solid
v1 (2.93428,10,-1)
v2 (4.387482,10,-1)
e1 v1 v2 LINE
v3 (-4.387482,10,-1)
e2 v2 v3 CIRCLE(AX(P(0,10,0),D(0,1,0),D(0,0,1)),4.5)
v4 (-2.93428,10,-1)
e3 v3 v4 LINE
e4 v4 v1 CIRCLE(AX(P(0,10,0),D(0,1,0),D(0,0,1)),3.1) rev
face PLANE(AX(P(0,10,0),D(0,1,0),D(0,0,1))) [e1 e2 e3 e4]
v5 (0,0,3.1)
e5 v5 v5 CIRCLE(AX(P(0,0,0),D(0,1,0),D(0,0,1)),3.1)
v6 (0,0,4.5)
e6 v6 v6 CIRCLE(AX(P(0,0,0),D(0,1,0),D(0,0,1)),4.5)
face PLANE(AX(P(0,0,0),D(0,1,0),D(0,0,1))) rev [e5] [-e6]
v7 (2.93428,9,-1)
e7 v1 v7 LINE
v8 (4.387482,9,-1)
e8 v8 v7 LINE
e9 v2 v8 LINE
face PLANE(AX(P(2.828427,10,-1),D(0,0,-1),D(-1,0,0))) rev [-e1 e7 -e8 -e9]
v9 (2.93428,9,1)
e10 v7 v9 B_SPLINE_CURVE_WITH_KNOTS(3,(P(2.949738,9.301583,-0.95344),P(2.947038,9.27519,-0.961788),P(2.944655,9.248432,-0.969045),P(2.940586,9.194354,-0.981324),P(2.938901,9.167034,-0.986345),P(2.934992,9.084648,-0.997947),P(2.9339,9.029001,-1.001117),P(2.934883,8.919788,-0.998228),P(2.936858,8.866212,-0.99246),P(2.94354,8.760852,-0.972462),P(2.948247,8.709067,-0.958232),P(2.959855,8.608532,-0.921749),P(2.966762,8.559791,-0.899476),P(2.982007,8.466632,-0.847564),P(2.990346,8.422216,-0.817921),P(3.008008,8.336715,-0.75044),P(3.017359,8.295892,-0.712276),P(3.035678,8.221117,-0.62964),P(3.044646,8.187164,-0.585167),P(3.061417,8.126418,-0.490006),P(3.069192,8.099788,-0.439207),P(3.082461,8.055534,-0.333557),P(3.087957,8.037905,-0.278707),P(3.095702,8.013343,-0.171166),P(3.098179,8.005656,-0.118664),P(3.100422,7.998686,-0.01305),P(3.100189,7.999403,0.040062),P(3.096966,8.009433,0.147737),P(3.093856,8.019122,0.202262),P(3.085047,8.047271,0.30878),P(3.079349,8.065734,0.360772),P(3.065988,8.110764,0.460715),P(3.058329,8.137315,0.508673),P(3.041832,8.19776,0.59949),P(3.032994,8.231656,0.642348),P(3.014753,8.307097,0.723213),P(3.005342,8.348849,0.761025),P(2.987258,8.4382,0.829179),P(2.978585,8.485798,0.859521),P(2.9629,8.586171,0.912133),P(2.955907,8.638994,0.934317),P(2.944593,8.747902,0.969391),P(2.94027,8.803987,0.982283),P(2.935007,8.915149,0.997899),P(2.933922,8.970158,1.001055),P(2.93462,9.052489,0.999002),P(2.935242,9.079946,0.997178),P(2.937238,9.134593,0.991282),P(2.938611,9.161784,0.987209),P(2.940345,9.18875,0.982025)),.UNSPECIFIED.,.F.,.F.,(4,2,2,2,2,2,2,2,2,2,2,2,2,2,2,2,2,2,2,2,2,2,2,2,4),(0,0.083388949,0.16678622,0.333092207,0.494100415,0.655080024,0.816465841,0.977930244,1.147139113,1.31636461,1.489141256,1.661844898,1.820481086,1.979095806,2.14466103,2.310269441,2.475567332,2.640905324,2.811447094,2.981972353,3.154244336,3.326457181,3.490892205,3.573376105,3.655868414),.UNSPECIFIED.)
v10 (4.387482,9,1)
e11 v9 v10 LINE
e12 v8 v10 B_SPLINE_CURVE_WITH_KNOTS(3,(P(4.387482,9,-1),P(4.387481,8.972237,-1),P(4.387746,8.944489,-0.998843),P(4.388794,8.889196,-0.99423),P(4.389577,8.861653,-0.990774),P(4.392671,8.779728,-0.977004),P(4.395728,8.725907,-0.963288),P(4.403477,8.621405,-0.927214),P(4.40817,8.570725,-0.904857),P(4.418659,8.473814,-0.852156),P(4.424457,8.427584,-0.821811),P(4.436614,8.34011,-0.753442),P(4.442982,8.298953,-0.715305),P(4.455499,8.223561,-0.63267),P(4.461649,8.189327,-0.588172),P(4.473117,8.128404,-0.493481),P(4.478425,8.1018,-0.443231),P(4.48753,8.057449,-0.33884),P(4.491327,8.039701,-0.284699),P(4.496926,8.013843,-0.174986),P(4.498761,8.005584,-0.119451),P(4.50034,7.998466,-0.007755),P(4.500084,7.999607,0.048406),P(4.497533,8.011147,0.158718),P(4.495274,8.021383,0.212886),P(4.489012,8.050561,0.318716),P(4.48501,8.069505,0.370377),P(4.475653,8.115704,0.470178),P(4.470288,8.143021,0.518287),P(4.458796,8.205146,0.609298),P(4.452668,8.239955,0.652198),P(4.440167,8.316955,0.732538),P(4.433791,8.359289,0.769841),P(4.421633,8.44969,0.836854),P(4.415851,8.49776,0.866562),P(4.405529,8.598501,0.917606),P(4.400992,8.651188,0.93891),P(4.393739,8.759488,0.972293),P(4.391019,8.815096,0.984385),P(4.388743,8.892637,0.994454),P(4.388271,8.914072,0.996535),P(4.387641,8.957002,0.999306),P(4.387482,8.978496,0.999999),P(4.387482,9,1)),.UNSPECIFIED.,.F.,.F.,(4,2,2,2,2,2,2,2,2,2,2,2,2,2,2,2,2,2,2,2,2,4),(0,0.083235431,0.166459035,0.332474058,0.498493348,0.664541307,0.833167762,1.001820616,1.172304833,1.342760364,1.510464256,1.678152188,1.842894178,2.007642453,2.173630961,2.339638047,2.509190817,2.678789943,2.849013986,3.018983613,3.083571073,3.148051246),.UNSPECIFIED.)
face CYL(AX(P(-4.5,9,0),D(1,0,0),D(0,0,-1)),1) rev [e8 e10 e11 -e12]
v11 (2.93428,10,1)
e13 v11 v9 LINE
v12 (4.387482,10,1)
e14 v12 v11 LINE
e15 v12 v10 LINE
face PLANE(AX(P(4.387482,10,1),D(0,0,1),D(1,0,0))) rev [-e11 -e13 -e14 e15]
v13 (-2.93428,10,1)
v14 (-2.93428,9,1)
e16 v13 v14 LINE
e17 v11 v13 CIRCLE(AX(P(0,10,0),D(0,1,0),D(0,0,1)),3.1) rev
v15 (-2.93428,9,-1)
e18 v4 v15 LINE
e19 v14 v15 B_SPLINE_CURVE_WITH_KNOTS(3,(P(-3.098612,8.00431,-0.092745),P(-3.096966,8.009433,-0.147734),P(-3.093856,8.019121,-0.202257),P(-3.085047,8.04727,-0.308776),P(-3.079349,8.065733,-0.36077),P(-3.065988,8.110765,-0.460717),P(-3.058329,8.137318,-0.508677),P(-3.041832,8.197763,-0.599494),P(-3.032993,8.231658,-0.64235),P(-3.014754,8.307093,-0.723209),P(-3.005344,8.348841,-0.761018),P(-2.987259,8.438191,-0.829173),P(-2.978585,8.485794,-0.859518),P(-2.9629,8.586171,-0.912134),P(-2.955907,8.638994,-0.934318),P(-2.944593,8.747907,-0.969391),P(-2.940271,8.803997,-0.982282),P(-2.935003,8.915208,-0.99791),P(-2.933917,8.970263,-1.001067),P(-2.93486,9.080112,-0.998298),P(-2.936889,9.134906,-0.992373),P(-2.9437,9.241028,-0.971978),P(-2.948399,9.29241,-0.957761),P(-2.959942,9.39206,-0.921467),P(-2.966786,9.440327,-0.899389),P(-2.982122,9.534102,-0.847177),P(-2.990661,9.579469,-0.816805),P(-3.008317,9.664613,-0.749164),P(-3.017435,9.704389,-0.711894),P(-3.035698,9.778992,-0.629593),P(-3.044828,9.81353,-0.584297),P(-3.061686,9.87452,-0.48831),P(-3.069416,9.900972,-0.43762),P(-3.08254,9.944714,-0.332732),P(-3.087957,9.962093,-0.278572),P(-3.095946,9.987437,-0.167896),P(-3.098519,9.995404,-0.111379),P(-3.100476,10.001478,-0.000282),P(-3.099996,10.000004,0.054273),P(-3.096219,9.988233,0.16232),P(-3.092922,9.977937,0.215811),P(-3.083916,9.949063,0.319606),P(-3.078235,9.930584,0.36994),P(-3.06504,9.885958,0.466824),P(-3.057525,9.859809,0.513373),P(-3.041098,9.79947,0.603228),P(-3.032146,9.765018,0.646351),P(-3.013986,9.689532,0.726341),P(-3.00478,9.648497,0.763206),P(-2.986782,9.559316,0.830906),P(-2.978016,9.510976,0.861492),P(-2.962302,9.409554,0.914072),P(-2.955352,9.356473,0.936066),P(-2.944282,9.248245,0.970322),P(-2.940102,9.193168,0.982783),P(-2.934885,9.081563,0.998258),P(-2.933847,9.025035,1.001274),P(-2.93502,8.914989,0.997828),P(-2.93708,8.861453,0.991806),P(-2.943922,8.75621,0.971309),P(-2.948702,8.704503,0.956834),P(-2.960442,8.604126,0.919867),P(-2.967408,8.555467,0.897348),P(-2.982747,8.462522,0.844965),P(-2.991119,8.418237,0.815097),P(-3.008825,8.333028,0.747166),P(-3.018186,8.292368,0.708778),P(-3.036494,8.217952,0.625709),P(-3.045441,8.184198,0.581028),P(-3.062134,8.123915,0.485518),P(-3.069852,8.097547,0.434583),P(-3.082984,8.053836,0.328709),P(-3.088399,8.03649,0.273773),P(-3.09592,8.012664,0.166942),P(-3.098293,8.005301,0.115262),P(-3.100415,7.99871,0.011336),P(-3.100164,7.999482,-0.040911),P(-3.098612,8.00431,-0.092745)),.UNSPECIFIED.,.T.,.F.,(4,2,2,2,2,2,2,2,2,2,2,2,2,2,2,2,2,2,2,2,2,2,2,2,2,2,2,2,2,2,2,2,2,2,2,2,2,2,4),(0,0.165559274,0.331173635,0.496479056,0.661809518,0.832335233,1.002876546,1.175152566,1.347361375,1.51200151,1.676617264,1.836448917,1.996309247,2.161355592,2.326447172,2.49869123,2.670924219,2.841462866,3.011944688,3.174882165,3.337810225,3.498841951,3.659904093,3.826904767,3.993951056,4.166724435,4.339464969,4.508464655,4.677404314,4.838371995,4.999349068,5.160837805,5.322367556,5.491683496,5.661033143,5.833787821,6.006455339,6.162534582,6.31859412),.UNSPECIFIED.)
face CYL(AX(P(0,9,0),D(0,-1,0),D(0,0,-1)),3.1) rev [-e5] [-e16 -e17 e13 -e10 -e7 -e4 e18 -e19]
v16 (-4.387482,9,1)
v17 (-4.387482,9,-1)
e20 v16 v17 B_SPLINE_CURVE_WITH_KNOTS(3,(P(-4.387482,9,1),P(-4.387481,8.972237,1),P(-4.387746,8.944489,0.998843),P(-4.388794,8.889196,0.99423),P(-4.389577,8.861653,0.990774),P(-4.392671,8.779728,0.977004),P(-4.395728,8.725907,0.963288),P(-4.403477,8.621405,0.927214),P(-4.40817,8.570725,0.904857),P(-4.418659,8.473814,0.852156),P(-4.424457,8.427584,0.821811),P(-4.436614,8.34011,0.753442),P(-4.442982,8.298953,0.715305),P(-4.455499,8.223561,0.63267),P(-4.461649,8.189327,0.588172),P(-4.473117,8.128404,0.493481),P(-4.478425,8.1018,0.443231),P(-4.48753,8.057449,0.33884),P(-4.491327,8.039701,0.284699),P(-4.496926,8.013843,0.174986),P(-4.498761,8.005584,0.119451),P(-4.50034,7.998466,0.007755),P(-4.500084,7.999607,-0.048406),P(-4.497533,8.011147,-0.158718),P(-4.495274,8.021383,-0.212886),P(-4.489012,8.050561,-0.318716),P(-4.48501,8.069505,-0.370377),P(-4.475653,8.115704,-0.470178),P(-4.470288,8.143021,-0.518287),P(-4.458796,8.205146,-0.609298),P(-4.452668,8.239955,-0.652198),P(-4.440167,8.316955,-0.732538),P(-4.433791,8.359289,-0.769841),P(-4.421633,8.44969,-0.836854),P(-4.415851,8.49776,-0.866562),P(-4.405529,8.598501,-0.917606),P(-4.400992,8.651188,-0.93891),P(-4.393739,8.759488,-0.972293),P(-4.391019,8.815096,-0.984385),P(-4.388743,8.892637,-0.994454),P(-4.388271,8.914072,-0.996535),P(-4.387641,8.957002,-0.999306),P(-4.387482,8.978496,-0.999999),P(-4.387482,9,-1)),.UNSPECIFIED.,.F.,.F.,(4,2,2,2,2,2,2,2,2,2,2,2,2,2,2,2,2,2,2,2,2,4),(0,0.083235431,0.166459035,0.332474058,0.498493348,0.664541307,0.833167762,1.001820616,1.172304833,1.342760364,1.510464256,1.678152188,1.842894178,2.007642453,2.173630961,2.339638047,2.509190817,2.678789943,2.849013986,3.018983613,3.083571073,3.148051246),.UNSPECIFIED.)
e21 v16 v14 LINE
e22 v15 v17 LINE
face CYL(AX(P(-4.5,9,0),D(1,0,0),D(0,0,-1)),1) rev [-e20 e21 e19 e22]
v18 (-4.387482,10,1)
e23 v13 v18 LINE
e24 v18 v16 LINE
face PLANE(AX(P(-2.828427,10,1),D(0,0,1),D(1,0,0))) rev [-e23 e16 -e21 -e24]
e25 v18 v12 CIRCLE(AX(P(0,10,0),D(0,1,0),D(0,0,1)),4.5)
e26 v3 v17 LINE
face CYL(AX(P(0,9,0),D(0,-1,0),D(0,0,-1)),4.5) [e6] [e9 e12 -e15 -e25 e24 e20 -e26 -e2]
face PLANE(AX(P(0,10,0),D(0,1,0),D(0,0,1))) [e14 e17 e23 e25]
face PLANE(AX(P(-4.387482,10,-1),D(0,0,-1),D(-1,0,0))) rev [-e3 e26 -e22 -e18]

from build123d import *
from build123d.topology import SkipClean

# Parameters (mm, degrees)
SKETCH_1_R               = 4.5
SKETCH_1_R_2             = 3
EXTRUDE_1_DEPTH          = 9
CUT_EXTRUDE_3_DEPTH      = 12.022703843
CUT_EXTRUDE_3_DEPTH_BACK = 12.022703843
SKETCH_2_R               = 1
EXTRUDE_2_DEPTH          = 1
MOVE_FACE_1_OUTLINE_R    = 3.1
MOVE_FACE_1_OUTLINE_R_2  = 3
MOVE_FACE_1_DEPTH        = 10


# Read off the part's stored shape, not the designer's step: 面の移動1
with BuildPart() as part:
    # ｽｹｯﾁ1 → ﾎﾞｽ - 押し出し1 (new body)
    with BuildSketch(Plane(origin=(0, 0, 0), x_dir=(1, 0, 0), z_dir=(0, 1, 0))):
        with Locations(Location((0, 0, 0), (0, 0, 270))):
            Circle(SKETCH_1_R)
        with Locations(Location((0, 0, 0), (0, 0, 270))):
            Circle(SKETCH_1_R_2, mode=Mode.SUBTRACT)
    extrude(amount=EXTRUDE_1_DEPTH)

    # ｽｹｯﾁ2 → ｶｯﾄ - 押し出し3 (cut, two sides: drawn at the far end of the back side and taken through both)
    with BuildSketch(Plane(origin=(0, 0, 0), x_dir=(0, 0, -1), z_dir=(1, 0, 0)).offset(-CUT_EXTRUDE_3_DEPTH_BACK)):
        with Locations((0, 9)):
            Circle(SKETCH_2_R)
    extrude(amount=CUT_EXTRUDE_3_DEPTH + CUT_EXTRUDE_3_DEPTH_BACK, mode=Mode.SUBTRACT)

    # ｽｹｯﾁ3 → ﾎﾞｽ - 押し出し2 (add)
    with SkipClean():  # the faces are left unmerged after this step: merging them gives an invalid solid
        with BuildSketch(Plane(origin=(0, 9, 0), x_dir=(1, 0, 0), z_dir=(0, 1, 0))):
            with BuildLine():
                Line((-2.828427125, -1), (-4.387482194, -1))
                ThreePointArc((-4.387482194, -1), (0, -4.5), (4.387482194, -1))
                Line((4.387482194, -1), (2.828427125, -1))
                ThreePointArc((2.828427125, -1), (0, -3), (-2.828427125, -1))
            make_face()
            with BuildLine():
                Line((2.828427125, 1), (4.387482194, 1))
                ThreePointArc((4.387482194, 1), (0, 4.5), (-4.387482194, 1))
                Line((-4.387482194, 1), (-2.828427125, 1))
                ThreePointArc((-2.828427125, 1), (0, 3), (2.828427125, 1))
            make_face()
        extrude(amount=EXTRUDE_2_DEPTH)

    # Move Face 1 outline → Move Face 1 (cut)
    with BuildSketch(Plane(origin=(0, 0, 0), x_dir=(1, 0, 0), z_dir=(0, 1, 0))):
        Circle(MOVE_FACE_1_OUTLINE_R)
        Circle(MOVE_FACE_1_OUTLINE_R_2, mode=Mode.SUBTRACT)
    extrude(amount=MOVE_FACE_1_DEPTH, mode=Mode.SUBTRACT)


solid = part.part
